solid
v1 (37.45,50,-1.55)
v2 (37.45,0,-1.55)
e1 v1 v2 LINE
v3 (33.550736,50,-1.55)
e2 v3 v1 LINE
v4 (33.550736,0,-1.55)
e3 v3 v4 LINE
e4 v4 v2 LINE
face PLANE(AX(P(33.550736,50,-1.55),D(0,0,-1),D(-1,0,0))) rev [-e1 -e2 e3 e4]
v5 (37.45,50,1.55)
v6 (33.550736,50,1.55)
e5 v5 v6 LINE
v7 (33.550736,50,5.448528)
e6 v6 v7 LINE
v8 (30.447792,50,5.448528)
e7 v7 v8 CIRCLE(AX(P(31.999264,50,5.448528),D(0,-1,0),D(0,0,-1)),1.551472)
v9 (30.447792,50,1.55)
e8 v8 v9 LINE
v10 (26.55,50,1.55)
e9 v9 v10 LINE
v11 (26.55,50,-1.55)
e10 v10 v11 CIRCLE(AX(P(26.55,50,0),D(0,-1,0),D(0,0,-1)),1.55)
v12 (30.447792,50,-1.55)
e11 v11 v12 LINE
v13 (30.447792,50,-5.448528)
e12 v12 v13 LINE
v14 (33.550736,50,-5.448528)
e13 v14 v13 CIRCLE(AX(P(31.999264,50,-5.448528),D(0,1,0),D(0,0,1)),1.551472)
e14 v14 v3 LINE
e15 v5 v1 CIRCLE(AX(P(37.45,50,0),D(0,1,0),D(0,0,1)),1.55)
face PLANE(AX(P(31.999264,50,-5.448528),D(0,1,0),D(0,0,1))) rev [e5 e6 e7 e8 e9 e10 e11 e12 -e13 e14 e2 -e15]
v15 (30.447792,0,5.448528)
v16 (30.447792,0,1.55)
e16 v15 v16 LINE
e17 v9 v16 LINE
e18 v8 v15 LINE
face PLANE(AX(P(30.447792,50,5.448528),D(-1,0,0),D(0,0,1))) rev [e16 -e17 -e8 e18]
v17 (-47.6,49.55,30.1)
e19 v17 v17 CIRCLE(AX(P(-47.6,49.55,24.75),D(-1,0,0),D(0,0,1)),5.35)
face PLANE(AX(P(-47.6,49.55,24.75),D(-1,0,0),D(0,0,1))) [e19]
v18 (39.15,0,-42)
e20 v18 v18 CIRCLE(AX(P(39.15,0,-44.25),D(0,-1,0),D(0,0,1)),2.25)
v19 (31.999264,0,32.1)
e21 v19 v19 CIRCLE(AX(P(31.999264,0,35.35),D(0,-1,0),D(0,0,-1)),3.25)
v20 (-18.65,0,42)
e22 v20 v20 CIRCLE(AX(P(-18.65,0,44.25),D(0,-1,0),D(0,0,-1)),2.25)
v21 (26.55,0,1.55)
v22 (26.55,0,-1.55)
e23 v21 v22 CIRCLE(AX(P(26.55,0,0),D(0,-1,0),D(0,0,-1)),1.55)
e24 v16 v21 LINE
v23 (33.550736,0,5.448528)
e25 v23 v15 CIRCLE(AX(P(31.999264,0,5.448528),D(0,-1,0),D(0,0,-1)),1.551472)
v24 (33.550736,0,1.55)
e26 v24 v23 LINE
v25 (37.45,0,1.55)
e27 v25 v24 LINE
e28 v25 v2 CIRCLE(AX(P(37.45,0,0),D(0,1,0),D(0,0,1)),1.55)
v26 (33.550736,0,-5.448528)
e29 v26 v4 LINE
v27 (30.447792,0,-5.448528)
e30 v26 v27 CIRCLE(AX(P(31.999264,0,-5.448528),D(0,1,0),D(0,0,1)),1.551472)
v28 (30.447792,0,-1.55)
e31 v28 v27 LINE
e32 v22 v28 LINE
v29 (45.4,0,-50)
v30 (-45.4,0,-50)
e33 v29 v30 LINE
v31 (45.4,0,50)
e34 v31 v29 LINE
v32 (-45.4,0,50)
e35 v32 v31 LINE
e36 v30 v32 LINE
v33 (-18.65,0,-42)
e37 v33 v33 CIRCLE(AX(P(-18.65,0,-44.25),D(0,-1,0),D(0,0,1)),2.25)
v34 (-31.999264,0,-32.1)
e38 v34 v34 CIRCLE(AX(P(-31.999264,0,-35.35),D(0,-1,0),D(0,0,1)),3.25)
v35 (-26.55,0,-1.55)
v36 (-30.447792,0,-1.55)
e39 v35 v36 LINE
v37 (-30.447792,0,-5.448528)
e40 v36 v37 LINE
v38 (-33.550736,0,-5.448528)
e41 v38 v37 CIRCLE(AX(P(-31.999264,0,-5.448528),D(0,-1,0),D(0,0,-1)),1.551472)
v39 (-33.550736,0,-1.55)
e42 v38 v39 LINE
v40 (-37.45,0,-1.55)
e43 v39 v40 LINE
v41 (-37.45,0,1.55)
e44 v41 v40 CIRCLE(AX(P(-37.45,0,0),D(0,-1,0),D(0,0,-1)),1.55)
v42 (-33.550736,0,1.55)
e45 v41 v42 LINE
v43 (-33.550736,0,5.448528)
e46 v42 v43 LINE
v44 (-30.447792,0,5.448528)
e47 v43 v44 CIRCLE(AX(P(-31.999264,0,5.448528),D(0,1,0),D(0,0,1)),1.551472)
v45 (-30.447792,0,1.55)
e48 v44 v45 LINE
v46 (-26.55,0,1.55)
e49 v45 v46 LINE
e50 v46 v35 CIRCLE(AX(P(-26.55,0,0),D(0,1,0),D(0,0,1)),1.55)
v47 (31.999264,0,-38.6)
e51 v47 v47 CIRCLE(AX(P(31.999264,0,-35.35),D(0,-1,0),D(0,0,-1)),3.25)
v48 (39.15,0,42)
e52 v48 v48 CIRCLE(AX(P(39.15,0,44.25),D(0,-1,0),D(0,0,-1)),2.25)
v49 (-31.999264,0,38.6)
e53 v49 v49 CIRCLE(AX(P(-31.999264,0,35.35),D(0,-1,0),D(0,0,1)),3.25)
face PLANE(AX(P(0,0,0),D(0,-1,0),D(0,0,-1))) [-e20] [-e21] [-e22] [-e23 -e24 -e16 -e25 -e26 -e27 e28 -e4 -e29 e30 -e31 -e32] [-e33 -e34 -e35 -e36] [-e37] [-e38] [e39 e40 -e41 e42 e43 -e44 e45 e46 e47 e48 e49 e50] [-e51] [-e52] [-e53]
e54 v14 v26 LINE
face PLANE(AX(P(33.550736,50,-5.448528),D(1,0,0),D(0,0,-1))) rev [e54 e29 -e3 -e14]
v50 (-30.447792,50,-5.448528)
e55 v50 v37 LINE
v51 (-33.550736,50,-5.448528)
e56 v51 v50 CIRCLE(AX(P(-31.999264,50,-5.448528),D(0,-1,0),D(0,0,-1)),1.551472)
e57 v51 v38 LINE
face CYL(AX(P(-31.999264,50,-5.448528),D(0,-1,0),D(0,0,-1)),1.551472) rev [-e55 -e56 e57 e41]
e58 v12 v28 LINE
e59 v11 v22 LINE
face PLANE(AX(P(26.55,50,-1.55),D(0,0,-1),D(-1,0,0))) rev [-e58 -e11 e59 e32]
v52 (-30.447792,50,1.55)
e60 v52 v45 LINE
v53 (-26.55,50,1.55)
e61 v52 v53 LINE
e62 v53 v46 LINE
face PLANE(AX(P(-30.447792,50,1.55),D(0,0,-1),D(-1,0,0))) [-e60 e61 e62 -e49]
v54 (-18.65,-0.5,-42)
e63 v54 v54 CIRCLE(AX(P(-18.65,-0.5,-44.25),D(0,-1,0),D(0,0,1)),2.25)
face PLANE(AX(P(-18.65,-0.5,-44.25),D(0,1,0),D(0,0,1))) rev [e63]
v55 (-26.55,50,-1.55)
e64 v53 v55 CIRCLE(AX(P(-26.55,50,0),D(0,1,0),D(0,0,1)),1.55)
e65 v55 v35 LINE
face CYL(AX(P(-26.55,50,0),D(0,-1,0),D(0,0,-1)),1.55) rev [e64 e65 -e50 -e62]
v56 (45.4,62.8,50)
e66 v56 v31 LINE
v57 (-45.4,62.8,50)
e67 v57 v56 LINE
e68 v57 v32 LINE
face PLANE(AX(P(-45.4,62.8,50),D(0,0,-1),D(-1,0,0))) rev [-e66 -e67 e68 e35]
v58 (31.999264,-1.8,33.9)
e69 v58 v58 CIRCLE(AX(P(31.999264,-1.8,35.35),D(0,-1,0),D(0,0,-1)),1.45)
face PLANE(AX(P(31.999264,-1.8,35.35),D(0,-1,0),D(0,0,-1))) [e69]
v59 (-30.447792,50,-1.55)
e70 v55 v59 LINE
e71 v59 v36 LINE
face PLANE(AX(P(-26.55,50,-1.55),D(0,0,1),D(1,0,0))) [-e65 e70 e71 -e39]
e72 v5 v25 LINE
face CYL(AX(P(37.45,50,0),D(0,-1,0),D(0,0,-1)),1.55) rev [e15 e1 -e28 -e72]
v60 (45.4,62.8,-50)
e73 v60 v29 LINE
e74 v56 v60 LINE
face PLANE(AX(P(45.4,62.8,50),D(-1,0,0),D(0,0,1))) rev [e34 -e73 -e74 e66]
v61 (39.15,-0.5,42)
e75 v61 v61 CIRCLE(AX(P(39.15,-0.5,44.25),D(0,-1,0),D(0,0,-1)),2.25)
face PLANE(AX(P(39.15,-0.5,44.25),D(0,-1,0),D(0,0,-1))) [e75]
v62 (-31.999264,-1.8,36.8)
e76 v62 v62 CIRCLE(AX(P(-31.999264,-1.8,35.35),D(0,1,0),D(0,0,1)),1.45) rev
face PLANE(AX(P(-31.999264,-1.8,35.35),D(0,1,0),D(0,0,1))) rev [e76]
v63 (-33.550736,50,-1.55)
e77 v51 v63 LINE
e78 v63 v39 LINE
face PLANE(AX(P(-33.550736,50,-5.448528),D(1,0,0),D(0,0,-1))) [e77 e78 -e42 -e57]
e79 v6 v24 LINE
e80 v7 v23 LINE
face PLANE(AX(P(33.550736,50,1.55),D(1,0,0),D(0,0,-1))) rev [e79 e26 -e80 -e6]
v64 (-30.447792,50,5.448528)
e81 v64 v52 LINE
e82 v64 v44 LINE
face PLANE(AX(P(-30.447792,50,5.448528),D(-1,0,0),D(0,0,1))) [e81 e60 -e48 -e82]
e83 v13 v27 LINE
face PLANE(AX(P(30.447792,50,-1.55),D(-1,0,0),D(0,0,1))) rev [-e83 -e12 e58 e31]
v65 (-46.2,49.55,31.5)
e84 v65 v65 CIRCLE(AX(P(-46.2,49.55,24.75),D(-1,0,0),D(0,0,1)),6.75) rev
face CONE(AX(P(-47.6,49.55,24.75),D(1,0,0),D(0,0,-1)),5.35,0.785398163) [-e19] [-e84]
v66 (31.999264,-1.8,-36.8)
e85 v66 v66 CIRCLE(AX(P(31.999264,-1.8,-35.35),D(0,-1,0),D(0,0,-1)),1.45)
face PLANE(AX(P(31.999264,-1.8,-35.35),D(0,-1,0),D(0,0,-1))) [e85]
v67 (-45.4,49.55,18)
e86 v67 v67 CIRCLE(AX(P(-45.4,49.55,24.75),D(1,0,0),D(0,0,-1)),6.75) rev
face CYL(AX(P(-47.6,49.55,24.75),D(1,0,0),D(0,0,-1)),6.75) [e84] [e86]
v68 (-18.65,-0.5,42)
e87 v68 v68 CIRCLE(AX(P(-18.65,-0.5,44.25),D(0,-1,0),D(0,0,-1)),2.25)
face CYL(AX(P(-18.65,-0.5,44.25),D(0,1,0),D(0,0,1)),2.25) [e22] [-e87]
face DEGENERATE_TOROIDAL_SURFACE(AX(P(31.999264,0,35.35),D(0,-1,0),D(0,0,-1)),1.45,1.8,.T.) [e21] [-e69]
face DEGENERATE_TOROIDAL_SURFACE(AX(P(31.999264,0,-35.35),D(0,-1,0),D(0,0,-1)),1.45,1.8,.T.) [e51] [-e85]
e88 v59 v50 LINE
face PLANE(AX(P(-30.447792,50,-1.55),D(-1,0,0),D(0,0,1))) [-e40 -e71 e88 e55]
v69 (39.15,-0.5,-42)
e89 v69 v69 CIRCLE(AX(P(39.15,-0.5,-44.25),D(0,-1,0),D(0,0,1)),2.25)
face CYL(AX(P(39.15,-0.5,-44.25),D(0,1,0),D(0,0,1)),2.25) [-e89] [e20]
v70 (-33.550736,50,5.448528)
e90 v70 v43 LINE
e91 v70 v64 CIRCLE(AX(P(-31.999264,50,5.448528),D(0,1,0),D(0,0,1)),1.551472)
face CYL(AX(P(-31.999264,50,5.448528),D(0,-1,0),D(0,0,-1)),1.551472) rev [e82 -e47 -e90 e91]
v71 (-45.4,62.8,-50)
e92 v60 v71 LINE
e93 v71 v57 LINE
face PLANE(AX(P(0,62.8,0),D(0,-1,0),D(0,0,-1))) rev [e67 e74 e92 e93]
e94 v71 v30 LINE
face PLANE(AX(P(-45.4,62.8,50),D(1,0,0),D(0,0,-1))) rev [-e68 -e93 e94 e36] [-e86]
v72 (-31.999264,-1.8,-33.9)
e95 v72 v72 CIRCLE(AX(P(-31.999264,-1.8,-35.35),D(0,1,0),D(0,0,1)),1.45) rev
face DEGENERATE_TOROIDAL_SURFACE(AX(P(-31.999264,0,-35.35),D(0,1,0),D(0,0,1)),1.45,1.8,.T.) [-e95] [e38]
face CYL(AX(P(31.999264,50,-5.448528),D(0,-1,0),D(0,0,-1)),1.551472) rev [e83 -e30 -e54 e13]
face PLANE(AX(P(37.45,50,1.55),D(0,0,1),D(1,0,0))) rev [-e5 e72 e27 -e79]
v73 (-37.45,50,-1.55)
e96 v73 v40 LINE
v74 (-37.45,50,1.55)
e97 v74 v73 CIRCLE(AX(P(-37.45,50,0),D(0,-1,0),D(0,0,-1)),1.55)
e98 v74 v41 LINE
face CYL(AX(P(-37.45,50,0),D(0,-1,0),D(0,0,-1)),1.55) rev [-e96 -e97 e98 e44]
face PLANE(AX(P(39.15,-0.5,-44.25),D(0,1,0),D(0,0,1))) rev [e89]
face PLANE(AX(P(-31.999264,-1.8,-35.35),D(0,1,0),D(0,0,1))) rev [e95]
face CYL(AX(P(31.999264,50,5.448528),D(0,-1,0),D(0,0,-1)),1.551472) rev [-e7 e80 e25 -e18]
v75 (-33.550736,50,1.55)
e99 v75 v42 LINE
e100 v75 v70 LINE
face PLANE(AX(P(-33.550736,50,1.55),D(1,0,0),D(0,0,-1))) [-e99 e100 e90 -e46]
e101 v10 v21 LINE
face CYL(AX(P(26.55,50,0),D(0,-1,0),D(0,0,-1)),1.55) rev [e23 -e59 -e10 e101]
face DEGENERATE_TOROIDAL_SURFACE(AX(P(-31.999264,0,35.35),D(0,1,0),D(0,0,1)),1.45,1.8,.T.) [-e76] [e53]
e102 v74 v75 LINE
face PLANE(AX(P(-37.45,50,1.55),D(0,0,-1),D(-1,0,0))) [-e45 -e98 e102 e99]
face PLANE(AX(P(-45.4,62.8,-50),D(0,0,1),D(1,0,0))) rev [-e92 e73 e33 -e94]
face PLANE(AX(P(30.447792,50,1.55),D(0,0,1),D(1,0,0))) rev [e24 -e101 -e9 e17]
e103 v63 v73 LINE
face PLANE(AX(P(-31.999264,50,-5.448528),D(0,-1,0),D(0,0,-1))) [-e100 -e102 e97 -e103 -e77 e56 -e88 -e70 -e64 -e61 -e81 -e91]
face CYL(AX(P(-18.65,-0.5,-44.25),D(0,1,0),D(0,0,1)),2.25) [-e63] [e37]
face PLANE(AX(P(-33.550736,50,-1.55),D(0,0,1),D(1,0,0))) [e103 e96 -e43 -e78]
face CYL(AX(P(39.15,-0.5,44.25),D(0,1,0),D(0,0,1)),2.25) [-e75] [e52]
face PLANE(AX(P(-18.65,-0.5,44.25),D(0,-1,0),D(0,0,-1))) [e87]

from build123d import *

# Parameters (mm, degrees)
SKETCH1_W           = 90.8
SKETCH1_H           = 100
BOSS_EXTRUDE1_DEPTH = 62.8
CUT_EXTRUDE2_DEPTH  = 50
SKETCH3_R           = 3.25
BOSS_EXTRUDE2_DEPTH = 1.8
FILLET3_R           = 1.8
SKETCH4_R           = 2.25
BOSS_EXTRUDE3_DEPTH = 0.5
SKETCH6_R           = 6.75
BOSS_EXTRUDE4_DEPTH = 2.2
CHAMFER2_SIZE       = 1.4


with BuildPart() as part:
    # Sketch1 → Boss-Extrude1 (new body)
    with BuildSketch(Plane(origin=(0, 0, 0), x_dir=(1, 0, 0), z_dir=(0, 1, 0))):
        Rectangle(SKETCH1_W, SKETCH1_H)
    extrude(amount=BOSS_EXTRUDE1_DEPTH)

    # Sketch2 → Cut-Extrude2 (cut)
    with BuildSketch(Plane(origin=(0, 0, 0), x_dir=(-1, 0, 0), z_dir=(0, -1, 0))):
        with BuildLine():
            Line((33.550736089, -1.55), (33.550736089, -5.448527997))
            ThreePointArc((33.550736089, -5.448527997), (31.999263911, -7.000000175), (30.447791734, -5.448527997))
            Line((30.447791734, -5.448527997), (30.447791734, -1.55))
            Line((30.447791734, -1.55), (26.55, -1.55))
            ThreePointArc((26.55, -1.55), (25, 0), (26.55, 1.55))
            Line((26.55, 1.55), (30.447791734, 1.55))
            Line((30.447791734, 1.55), (30.447791734, 5.448527997))
            ThreePointArc((30.447791734, 5.448527997), (31.999263911, 7.000000175), (33.550736089, 5.448527997))
            Line((33.550736089, 5.448527997), (33.550736089, 1.55))
            Line((33.550736089, 1.55), (37.45, 1.55))
            ThreePointArc((37.45, 1.55), (39, 0), (37.45, -1.55))
            Line((37.45, -1.55), (33.550736089, -1.55))
        make_face()
        with BuildLine():
            Line((-30.447791734, 1.55), (-30.447791734, 5.448527997))
            ThreePointArc((-30.447791734, 5.448527997), (-31.999263911, 7.000000175), (-33.550736089, 5.448527997))
            Line((-33.550736089, 5.448527997), (-33.550736089, 1.55))
            Line((-33.550736089, 1.55), (-37.45, 1.55))
            ThreePointArc((-37.45, 1.55), (-39, 0), (-37.45, -1.55))
            Line((-37.45, -1.55), (-33.550736089, -1.55))
            Line((-33.550736089, -1.55), (-33.550736089, -5.448527997))
            ThreePointArc((-33.550736089, -5.448527997), (-31.999263911, -7.000000175), (-30.447791734, -5.448527997))
            Line((-30.447791734, -5.448527997), (-30.447791734, -1.55))
            Line((-30.447791734, -1.55), (-26.55, -1.55))
            ThreePointArc((-26.55, -1.55), (-25, 0), (-26.55, 1.55))
            Line((-26.55, 1.55), (-30.447791734, 1.55))
        make_face()
    extrude(amount=-CUT_EXTRUDE2_DEPTH, mode=Mode.SUBTRACT)

    # Sketch3 → Boss-Extrude2 (add)
    with BuildSketch(Plane.XZ):
        with Locations(Location((31.999263911, 35.350000175, 0), (0, 0, 270))):
            Circle(SKETCH3_R)
        with Locations(Location((31.999263911, -35.350000175, 0), (0, 0, 270))):
            Circle(SKETCH3_R)
        with Locations(Location((-31.999263911, -35.350000175, 0), (0, 0, 90))):
            Circle(SKETCH3_R)
        with Locations(Location((-31.999263911, 35.350000175, 0), (0, 0, 90))):
            Circle(SKETCH3_R)
    extrude(amount=BOSS_EXTRUDE2_DEPTH)

    # Fillet3
    fillet3_edges = [part.edges().sort_by_distance(p)[0] for p in [
        (-31.999263911, -1.8, 32.100000175),
        (31.999263911, -1.8, -32.100000175),
        (31.999263911, -1.8, 38.600000175),
        (-31.999263911, -1.8, -38.600000175),
    ]]
    fillet(fillet3_edges, radius=FILLET3_R - 0.0001)  # a hair under: the kernel refuses the full size

    # Sketch4 → Boss-Extrude3 (add)
    with BuildSketch(Plane(origin=(0, 0, 0), x_dir=(-1, 0, 0), z_dir=(0, -1, 0))):
        with Locations(Location((18.65, -44.25, 0), (0, 0, 90))):
            Circle(SKETCH4_R)
        with Locations(Location((-39.15, -44.25, 0), (0, 0, 90))):
            Circle(SKETCH4_R)
        with Locations(Location((-39.15, 44.25, 0), (0, 0, 270))):
            Circle(SKETCH4_R)
        with Locations(Location((18.65, 44.25, 0), (0, 0, 270))):
            Circle(SKETCH4_R)
    extrude(amount=BOSS_EXTRUDE3_DEPTH)

    # Sketch6 → Boss-Extrude4 (add)
    with BuildSketch(Plane.ZY.offset(45.4)):
        with Locations(Location((24.75, 49.55, 0), (0, 0, 180))):
            Circle(SKETCH6_R)
    extrude(amount=BOSS_EXTRUDE4_DEPTH)

    # Chamfer2
    chamfer2_edges = [part.edges().sort_by_distance(p)[0] for p in [
        (-47.6, 49.55, 31.5),
    ]]
    chamfer(chamfer2_edges, length=CHAMFER2_SIZE)


solid = part.part
